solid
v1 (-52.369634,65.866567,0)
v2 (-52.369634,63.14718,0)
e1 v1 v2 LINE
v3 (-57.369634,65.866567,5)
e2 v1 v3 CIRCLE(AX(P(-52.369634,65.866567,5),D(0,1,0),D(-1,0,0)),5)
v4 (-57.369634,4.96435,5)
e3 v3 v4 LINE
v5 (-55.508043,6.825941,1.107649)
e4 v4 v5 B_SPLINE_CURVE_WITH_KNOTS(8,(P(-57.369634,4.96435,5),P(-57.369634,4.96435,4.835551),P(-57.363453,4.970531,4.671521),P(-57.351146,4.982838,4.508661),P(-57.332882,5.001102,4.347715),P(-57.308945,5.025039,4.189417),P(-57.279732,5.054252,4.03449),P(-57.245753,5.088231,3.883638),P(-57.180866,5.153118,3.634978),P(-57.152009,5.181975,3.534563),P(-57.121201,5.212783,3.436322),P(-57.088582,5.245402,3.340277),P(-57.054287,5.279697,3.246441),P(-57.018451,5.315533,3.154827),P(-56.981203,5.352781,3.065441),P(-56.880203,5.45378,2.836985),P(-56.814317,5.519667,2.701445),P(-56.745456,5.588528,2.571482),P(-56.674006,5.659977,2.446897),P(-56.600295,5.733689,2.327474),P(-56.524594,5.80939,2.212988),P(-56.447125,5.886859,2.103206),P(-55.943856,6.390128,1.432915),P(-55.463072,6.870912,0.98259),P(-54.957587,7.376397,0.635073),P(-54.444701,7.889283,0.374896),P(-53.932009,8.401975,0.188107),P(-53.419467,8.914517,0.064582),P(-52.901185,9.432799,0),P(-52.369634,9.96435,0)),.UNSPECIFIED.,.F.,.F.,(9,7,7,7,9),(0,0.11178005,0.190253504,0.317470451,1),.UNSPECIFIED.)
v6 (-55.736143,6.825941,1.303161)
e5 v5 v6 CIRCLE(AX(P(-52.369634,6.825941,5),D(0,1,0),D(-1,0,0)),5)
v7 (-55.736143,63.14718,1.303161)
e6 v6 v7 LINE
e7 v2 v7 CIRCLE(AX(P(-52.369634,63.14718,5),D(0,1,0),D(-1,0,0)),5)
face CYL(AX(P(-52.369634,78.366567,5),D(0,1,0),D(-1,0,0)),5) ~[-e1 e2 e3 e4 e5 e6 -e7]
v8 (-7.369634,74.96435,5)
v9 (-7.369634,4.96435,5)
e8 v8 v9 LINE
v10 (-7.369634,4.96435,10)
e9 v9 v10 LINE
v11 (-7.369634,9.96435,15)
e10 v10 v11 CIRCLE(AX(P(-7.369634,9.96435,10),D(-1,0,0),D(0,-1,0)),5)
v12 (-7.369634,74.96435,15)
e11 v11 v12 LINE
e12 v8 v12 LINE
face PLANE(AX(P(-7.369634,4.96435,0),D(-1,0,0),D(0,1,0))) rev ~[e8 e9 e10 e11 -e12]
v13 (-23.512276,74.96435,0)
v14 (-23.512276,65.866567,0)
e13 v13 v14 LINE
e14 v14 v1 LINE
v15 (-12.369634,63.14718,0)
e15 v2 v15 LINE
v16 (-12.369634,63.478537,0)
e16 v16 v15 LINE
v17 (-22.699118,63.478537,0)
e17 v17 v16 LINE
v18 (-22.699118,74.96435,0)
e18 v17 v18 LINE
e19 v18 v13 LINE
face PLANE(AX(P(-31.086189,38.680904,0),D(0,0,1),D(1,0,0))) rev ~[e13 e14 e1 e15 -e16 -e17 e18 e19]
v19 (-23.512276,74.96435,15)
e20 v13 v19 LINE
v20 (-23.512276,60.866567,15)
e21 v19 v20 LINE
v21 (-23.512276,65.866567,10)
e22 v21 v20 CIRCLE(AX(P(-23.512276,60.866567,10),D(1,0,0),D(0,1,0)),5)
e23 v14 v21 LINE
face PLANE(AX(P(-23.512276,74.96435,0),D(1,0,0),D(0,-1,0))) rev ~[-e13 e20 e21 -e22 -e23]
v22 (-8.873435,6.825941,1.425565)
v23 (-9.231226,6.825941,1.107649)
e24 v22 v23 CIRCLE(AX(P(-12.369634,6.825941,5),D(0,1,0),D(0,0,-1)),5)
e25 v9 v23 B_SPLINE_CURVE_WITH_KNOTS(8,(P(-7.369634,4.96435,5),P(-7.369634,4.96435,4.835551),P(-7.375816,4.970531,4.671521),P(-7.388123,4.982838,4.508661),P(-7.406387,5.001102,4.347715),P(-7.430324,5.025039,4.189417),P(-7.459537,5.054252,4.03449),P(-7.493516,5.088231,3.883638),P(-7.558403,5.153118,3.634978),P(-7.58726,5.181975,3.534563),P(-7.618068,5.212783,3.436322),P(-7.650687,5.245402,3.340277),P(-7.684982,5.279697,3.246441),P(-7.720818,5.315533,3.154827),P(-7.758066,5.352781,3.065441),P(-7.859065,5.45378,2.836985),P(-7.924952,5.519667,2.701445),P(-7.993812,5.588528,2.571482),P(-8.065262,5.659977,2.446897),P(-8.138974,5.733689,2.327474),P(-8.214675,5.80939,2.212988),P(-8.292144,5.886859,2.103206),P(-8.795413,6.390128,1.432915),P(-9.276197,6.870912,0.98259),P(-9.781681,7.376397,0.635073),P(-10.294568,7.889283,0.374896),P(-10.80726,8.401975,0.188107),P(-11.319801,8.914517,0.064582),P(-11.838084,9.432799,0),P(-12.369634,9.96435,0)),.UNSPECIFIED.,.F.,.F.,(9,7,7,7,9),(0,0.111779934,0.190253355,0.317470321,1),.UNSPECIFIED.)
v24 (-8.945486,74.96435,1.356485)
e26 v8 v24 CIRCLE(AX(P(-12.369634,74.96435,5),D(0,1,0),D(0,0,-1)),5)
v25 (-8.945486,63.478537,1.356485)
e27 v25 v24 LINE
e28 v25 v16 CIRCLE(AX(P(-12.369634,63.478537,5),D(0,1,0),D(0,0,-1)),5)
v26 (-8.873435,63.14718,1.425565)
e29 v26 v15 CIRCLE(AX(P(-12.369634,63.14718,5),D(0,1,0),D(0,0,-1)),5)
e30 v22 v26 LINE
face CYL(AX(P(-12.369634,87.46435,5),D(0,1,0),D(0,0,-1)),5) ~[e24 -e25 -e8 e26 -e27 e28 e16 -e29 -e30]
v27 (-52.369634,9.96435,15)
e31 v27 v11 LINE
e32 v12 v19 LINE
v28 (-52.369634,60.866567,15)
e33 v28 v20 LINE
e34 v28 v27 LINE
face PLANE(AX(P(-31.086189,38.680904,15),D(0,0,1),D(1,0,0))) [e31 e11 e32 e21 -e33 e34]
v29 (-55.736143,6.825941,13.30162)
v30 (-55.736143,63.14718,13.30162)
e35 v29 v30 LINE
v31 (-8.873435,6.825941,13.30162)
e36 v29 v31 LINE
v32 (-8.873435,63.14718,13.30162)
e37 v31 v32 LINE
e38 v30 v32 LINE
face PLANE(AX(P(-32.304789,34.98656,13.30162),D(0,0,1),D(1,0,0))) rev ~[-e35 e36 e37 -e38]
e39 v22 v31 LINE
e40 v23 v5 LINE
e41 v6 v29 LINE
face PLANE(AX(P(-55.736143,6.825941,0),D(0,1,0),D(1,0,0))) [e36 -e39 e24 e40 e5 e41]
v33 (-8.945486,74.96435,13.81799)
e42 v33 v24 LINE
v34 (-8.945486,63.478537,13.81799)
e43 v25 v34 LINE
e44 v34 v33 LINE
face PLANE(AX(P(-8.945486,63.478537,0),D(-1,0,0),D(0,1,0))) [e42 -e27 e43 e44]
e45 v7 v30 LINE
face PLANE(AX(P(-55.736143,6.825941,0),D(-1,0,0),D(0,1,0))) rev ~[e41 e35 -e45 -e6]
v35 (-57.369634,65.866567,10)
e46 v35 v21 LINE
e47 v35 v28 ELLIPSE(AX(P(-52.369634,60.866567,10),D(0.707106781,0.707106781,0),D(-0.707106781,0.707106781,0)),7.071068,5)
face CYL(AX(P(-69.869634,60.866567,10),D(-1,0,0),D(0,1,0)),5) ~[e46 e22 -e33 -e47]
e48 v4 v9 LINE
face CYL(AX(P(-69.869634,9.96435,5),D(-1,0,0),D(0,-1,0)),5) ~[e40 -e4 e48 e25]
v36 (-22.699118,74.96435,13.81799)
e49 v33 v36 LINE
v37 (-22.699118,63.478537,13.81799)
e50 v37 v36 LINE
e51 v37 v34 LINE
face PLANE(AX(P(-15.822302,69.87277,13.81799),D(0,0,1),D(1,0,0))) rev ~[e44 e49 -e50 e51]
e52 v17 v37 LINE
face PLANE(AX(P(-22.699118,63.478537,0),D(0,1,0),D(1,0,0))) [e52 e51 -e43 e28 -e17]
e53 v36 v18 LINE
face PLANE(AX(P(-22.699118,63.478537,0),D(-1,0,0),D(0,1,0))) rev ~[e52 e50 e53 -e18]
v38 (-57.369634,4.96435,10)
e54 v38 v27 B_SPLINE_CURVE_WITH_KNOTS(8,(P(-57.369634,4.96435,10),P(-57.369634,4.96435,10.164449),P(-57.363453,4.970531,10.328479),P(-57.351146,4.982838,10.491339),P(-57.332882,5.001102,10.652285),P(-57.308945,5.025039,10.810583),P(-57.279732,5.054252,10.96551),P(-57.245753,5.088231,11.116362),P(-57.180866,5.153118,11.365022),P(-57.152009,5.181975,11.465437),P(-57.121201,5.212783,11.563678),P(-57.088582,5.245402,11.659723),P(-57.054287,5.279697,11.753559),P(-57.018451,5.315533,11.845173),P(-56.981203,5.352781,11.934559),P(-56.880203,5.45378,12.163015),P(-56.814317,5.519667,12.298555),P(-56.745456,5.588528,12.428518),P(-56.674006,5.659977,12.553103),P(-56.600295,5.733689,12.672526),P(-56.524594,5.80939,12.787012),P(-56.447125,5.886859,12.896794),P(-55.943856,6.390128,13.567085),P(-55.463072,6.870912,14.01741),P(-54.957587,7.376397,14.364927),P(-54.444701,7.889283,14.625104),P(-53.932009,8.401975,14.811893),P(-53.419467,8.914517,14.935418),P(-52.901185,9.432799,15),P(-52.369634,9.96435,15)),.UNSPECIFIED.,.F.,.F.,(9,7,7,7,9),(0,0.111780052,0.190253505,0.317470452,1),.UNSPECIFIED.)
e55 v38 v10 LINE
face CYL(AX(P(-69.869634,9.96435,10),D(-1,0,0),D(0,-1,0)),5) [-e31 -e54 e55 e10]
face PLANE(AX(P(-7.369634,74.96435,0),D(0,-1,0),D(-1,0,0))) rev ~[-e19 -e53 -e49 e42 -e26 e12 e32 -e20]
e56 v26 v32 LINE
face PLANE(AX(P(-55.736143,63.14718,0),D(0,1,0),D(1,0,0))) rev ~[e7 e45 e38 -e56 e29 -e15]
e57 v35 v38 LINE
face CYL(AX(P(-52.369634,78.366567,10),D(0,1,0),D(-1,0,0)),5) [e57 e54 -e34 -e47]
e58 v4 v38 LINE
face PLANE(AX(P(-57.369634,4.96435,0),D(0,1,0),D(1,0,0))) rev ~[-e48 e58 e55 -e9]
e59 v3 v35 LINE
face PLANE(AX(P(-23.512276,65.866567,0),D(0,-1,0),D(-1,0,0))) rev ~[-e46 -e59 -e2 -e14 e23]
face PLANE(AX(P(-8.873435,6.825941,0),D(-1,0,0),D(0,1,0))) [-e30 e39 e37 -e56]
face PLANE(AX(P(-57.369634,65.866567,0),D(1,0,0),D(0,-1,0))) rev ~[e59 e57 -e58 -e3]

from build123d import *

# Parameters (mm, degrees)
F1_DEPTH    = 15
F2_W        = 46.8627084047
F2_H        = 56.3212386332
F3_DEPTH    = 13.30162
F4_W        = 13.7536320835
F4_H        = 12.7884671092
F5_DEPTH    = 13.81799
F6_T1_DEPTH = 75
F6_T3_DEPTH = 85.9022176913
F6_T5_DEPTH = 46.3573584799
F6_T7_DEPTH = 95


# Not quite as in the source:
# - a fillet or chamfer that OpenCascade refuses, or shapes differently, is made with other operations: its cross-section is extruded or revolved along the edge and cut away or added


with BuildPart() as f1:
    # F0 (on Top) → F1 (new body)
    with BuildSketch(Plane.XY):
        Polygon((-57.3696343694, 65.8665671945), (-57.3696343694, 4.9643495032), (-7.3696343694, 4.9643495032), (-7.3696343694, 74.9643495032), (-23.5122758895, 74.9643495032), (-23.5122758895, 65.8665671945), align=None)
    extrude(amount=F1_DEPTH)

    # F2 (on Top) → F3 (cut)
    with BuildSketch(Plane.XY):
        with Locations((-32.3047889397, 34.9865604658)):
            Rectangle(F2_W, F2_H)
    extrude(amount=F3_DEPTH, mode=Mode.SUBTRACT)

    # F4 (on Top) → F5 (cut)
    with BuildSketch(Plane.XY):
        with Locations((-15.8223016188, 69.8727704585)):
            Rectangle(F4_W, F4_H)
    extrude(amount=F5_DEPTH, mode=Mode.SUBTRACT)

    # F6: fillet of radius 5 on 6 edges, made by hand

    # F6_s2 → F6_t1 (cut)
    with BuildSketch(Plane.YZ.offset(-69.8696343694)):
        with BuildLine():
            ThreePointArc((4.9643495032, 10), (6.4288155972, 13.5355339059), (9.9643495032, 15))
            Line((9.9643495032, 15), (4.9643495032, 15))
            Line((4.9643495032, 15), (4.9643495032, 10))
        make_face()
        with BuildLine():
            ThreePointArc((4.9643495032, 5), (6.4288155972, 1.4644660941), (9.9643495032, 0))
            Line((9.9643495032, 0), (4.9643495032, 0))
            Line((4.9643495032, 0), (4.9643495032, 5))
        make_face()
    extrude(amount=F6_T1_DEPTH, mode=Mode.SUBTRACT)

    # F6_s4 → F6_t3 (cut)
    with BuildSketch(Plane.XZ.offset(-78.3665671945)):
        with BuildLine():
            ThreePointArc((-57.3696343694, 10), (-55.9051682753, 13.5355339059), (-52.3696343694, 15))
            Line((-52.3696343694, 15), (-57.3696343694, 15))
            Line((-57.3696343694, 15), (-57.3696343694, 10))
        make_face()
        with BuildLine():
            ThreePointArc((-57.3696343694, 5), (-55.9051682753, 1.4644660941), (-52.3696343694, 0))
            Line((-52.3696343694, 0), (-57.3696343694, 0))
            Line((-57.3696343694, 0), (-57.3696343694, 5))
        make_face()
    extrude(amount=F6_T3_DEPTH, mode=Mode.SUBTRACT)

    # F6_s6 → F6_t5 (cut)
    with BuildSketch(Plane.YZ.offset(-69.8696343694)):
        with BuildLine():
            ThreePointArc((65.8665671945, 10), (64.4021011004, 13.5355339059), (60.8665671945, 15))
            Line((60.8665671945, 15), (65.8665671945, 15))
            Line((65.8665671945, 15), (65.8665671945, 10))
        make_face()
    extrude(amount=F6_T5_DEPTH, mode=Mode.SUBTRACT)

    # F6_s8 → F6_t7 (cut)
    with BuildSketch(Plane.XZ.offset(-87.4643495032)):
        with BuildLine():
            ThreePointArc((-12.3696343694, 0), (-8.8341004635, 1.4644660941), (-7.3696343694, 5))
            Line((-7.3696343694, 5), (-7.3696343694, 0))
            Line((-7.3696343694, 0), (-12.3696343694, 0))
        make_face()
    extrude(amount=F6_T7_DEPTH, mode=Mode.SUBTRACT)


solid = f1.part
